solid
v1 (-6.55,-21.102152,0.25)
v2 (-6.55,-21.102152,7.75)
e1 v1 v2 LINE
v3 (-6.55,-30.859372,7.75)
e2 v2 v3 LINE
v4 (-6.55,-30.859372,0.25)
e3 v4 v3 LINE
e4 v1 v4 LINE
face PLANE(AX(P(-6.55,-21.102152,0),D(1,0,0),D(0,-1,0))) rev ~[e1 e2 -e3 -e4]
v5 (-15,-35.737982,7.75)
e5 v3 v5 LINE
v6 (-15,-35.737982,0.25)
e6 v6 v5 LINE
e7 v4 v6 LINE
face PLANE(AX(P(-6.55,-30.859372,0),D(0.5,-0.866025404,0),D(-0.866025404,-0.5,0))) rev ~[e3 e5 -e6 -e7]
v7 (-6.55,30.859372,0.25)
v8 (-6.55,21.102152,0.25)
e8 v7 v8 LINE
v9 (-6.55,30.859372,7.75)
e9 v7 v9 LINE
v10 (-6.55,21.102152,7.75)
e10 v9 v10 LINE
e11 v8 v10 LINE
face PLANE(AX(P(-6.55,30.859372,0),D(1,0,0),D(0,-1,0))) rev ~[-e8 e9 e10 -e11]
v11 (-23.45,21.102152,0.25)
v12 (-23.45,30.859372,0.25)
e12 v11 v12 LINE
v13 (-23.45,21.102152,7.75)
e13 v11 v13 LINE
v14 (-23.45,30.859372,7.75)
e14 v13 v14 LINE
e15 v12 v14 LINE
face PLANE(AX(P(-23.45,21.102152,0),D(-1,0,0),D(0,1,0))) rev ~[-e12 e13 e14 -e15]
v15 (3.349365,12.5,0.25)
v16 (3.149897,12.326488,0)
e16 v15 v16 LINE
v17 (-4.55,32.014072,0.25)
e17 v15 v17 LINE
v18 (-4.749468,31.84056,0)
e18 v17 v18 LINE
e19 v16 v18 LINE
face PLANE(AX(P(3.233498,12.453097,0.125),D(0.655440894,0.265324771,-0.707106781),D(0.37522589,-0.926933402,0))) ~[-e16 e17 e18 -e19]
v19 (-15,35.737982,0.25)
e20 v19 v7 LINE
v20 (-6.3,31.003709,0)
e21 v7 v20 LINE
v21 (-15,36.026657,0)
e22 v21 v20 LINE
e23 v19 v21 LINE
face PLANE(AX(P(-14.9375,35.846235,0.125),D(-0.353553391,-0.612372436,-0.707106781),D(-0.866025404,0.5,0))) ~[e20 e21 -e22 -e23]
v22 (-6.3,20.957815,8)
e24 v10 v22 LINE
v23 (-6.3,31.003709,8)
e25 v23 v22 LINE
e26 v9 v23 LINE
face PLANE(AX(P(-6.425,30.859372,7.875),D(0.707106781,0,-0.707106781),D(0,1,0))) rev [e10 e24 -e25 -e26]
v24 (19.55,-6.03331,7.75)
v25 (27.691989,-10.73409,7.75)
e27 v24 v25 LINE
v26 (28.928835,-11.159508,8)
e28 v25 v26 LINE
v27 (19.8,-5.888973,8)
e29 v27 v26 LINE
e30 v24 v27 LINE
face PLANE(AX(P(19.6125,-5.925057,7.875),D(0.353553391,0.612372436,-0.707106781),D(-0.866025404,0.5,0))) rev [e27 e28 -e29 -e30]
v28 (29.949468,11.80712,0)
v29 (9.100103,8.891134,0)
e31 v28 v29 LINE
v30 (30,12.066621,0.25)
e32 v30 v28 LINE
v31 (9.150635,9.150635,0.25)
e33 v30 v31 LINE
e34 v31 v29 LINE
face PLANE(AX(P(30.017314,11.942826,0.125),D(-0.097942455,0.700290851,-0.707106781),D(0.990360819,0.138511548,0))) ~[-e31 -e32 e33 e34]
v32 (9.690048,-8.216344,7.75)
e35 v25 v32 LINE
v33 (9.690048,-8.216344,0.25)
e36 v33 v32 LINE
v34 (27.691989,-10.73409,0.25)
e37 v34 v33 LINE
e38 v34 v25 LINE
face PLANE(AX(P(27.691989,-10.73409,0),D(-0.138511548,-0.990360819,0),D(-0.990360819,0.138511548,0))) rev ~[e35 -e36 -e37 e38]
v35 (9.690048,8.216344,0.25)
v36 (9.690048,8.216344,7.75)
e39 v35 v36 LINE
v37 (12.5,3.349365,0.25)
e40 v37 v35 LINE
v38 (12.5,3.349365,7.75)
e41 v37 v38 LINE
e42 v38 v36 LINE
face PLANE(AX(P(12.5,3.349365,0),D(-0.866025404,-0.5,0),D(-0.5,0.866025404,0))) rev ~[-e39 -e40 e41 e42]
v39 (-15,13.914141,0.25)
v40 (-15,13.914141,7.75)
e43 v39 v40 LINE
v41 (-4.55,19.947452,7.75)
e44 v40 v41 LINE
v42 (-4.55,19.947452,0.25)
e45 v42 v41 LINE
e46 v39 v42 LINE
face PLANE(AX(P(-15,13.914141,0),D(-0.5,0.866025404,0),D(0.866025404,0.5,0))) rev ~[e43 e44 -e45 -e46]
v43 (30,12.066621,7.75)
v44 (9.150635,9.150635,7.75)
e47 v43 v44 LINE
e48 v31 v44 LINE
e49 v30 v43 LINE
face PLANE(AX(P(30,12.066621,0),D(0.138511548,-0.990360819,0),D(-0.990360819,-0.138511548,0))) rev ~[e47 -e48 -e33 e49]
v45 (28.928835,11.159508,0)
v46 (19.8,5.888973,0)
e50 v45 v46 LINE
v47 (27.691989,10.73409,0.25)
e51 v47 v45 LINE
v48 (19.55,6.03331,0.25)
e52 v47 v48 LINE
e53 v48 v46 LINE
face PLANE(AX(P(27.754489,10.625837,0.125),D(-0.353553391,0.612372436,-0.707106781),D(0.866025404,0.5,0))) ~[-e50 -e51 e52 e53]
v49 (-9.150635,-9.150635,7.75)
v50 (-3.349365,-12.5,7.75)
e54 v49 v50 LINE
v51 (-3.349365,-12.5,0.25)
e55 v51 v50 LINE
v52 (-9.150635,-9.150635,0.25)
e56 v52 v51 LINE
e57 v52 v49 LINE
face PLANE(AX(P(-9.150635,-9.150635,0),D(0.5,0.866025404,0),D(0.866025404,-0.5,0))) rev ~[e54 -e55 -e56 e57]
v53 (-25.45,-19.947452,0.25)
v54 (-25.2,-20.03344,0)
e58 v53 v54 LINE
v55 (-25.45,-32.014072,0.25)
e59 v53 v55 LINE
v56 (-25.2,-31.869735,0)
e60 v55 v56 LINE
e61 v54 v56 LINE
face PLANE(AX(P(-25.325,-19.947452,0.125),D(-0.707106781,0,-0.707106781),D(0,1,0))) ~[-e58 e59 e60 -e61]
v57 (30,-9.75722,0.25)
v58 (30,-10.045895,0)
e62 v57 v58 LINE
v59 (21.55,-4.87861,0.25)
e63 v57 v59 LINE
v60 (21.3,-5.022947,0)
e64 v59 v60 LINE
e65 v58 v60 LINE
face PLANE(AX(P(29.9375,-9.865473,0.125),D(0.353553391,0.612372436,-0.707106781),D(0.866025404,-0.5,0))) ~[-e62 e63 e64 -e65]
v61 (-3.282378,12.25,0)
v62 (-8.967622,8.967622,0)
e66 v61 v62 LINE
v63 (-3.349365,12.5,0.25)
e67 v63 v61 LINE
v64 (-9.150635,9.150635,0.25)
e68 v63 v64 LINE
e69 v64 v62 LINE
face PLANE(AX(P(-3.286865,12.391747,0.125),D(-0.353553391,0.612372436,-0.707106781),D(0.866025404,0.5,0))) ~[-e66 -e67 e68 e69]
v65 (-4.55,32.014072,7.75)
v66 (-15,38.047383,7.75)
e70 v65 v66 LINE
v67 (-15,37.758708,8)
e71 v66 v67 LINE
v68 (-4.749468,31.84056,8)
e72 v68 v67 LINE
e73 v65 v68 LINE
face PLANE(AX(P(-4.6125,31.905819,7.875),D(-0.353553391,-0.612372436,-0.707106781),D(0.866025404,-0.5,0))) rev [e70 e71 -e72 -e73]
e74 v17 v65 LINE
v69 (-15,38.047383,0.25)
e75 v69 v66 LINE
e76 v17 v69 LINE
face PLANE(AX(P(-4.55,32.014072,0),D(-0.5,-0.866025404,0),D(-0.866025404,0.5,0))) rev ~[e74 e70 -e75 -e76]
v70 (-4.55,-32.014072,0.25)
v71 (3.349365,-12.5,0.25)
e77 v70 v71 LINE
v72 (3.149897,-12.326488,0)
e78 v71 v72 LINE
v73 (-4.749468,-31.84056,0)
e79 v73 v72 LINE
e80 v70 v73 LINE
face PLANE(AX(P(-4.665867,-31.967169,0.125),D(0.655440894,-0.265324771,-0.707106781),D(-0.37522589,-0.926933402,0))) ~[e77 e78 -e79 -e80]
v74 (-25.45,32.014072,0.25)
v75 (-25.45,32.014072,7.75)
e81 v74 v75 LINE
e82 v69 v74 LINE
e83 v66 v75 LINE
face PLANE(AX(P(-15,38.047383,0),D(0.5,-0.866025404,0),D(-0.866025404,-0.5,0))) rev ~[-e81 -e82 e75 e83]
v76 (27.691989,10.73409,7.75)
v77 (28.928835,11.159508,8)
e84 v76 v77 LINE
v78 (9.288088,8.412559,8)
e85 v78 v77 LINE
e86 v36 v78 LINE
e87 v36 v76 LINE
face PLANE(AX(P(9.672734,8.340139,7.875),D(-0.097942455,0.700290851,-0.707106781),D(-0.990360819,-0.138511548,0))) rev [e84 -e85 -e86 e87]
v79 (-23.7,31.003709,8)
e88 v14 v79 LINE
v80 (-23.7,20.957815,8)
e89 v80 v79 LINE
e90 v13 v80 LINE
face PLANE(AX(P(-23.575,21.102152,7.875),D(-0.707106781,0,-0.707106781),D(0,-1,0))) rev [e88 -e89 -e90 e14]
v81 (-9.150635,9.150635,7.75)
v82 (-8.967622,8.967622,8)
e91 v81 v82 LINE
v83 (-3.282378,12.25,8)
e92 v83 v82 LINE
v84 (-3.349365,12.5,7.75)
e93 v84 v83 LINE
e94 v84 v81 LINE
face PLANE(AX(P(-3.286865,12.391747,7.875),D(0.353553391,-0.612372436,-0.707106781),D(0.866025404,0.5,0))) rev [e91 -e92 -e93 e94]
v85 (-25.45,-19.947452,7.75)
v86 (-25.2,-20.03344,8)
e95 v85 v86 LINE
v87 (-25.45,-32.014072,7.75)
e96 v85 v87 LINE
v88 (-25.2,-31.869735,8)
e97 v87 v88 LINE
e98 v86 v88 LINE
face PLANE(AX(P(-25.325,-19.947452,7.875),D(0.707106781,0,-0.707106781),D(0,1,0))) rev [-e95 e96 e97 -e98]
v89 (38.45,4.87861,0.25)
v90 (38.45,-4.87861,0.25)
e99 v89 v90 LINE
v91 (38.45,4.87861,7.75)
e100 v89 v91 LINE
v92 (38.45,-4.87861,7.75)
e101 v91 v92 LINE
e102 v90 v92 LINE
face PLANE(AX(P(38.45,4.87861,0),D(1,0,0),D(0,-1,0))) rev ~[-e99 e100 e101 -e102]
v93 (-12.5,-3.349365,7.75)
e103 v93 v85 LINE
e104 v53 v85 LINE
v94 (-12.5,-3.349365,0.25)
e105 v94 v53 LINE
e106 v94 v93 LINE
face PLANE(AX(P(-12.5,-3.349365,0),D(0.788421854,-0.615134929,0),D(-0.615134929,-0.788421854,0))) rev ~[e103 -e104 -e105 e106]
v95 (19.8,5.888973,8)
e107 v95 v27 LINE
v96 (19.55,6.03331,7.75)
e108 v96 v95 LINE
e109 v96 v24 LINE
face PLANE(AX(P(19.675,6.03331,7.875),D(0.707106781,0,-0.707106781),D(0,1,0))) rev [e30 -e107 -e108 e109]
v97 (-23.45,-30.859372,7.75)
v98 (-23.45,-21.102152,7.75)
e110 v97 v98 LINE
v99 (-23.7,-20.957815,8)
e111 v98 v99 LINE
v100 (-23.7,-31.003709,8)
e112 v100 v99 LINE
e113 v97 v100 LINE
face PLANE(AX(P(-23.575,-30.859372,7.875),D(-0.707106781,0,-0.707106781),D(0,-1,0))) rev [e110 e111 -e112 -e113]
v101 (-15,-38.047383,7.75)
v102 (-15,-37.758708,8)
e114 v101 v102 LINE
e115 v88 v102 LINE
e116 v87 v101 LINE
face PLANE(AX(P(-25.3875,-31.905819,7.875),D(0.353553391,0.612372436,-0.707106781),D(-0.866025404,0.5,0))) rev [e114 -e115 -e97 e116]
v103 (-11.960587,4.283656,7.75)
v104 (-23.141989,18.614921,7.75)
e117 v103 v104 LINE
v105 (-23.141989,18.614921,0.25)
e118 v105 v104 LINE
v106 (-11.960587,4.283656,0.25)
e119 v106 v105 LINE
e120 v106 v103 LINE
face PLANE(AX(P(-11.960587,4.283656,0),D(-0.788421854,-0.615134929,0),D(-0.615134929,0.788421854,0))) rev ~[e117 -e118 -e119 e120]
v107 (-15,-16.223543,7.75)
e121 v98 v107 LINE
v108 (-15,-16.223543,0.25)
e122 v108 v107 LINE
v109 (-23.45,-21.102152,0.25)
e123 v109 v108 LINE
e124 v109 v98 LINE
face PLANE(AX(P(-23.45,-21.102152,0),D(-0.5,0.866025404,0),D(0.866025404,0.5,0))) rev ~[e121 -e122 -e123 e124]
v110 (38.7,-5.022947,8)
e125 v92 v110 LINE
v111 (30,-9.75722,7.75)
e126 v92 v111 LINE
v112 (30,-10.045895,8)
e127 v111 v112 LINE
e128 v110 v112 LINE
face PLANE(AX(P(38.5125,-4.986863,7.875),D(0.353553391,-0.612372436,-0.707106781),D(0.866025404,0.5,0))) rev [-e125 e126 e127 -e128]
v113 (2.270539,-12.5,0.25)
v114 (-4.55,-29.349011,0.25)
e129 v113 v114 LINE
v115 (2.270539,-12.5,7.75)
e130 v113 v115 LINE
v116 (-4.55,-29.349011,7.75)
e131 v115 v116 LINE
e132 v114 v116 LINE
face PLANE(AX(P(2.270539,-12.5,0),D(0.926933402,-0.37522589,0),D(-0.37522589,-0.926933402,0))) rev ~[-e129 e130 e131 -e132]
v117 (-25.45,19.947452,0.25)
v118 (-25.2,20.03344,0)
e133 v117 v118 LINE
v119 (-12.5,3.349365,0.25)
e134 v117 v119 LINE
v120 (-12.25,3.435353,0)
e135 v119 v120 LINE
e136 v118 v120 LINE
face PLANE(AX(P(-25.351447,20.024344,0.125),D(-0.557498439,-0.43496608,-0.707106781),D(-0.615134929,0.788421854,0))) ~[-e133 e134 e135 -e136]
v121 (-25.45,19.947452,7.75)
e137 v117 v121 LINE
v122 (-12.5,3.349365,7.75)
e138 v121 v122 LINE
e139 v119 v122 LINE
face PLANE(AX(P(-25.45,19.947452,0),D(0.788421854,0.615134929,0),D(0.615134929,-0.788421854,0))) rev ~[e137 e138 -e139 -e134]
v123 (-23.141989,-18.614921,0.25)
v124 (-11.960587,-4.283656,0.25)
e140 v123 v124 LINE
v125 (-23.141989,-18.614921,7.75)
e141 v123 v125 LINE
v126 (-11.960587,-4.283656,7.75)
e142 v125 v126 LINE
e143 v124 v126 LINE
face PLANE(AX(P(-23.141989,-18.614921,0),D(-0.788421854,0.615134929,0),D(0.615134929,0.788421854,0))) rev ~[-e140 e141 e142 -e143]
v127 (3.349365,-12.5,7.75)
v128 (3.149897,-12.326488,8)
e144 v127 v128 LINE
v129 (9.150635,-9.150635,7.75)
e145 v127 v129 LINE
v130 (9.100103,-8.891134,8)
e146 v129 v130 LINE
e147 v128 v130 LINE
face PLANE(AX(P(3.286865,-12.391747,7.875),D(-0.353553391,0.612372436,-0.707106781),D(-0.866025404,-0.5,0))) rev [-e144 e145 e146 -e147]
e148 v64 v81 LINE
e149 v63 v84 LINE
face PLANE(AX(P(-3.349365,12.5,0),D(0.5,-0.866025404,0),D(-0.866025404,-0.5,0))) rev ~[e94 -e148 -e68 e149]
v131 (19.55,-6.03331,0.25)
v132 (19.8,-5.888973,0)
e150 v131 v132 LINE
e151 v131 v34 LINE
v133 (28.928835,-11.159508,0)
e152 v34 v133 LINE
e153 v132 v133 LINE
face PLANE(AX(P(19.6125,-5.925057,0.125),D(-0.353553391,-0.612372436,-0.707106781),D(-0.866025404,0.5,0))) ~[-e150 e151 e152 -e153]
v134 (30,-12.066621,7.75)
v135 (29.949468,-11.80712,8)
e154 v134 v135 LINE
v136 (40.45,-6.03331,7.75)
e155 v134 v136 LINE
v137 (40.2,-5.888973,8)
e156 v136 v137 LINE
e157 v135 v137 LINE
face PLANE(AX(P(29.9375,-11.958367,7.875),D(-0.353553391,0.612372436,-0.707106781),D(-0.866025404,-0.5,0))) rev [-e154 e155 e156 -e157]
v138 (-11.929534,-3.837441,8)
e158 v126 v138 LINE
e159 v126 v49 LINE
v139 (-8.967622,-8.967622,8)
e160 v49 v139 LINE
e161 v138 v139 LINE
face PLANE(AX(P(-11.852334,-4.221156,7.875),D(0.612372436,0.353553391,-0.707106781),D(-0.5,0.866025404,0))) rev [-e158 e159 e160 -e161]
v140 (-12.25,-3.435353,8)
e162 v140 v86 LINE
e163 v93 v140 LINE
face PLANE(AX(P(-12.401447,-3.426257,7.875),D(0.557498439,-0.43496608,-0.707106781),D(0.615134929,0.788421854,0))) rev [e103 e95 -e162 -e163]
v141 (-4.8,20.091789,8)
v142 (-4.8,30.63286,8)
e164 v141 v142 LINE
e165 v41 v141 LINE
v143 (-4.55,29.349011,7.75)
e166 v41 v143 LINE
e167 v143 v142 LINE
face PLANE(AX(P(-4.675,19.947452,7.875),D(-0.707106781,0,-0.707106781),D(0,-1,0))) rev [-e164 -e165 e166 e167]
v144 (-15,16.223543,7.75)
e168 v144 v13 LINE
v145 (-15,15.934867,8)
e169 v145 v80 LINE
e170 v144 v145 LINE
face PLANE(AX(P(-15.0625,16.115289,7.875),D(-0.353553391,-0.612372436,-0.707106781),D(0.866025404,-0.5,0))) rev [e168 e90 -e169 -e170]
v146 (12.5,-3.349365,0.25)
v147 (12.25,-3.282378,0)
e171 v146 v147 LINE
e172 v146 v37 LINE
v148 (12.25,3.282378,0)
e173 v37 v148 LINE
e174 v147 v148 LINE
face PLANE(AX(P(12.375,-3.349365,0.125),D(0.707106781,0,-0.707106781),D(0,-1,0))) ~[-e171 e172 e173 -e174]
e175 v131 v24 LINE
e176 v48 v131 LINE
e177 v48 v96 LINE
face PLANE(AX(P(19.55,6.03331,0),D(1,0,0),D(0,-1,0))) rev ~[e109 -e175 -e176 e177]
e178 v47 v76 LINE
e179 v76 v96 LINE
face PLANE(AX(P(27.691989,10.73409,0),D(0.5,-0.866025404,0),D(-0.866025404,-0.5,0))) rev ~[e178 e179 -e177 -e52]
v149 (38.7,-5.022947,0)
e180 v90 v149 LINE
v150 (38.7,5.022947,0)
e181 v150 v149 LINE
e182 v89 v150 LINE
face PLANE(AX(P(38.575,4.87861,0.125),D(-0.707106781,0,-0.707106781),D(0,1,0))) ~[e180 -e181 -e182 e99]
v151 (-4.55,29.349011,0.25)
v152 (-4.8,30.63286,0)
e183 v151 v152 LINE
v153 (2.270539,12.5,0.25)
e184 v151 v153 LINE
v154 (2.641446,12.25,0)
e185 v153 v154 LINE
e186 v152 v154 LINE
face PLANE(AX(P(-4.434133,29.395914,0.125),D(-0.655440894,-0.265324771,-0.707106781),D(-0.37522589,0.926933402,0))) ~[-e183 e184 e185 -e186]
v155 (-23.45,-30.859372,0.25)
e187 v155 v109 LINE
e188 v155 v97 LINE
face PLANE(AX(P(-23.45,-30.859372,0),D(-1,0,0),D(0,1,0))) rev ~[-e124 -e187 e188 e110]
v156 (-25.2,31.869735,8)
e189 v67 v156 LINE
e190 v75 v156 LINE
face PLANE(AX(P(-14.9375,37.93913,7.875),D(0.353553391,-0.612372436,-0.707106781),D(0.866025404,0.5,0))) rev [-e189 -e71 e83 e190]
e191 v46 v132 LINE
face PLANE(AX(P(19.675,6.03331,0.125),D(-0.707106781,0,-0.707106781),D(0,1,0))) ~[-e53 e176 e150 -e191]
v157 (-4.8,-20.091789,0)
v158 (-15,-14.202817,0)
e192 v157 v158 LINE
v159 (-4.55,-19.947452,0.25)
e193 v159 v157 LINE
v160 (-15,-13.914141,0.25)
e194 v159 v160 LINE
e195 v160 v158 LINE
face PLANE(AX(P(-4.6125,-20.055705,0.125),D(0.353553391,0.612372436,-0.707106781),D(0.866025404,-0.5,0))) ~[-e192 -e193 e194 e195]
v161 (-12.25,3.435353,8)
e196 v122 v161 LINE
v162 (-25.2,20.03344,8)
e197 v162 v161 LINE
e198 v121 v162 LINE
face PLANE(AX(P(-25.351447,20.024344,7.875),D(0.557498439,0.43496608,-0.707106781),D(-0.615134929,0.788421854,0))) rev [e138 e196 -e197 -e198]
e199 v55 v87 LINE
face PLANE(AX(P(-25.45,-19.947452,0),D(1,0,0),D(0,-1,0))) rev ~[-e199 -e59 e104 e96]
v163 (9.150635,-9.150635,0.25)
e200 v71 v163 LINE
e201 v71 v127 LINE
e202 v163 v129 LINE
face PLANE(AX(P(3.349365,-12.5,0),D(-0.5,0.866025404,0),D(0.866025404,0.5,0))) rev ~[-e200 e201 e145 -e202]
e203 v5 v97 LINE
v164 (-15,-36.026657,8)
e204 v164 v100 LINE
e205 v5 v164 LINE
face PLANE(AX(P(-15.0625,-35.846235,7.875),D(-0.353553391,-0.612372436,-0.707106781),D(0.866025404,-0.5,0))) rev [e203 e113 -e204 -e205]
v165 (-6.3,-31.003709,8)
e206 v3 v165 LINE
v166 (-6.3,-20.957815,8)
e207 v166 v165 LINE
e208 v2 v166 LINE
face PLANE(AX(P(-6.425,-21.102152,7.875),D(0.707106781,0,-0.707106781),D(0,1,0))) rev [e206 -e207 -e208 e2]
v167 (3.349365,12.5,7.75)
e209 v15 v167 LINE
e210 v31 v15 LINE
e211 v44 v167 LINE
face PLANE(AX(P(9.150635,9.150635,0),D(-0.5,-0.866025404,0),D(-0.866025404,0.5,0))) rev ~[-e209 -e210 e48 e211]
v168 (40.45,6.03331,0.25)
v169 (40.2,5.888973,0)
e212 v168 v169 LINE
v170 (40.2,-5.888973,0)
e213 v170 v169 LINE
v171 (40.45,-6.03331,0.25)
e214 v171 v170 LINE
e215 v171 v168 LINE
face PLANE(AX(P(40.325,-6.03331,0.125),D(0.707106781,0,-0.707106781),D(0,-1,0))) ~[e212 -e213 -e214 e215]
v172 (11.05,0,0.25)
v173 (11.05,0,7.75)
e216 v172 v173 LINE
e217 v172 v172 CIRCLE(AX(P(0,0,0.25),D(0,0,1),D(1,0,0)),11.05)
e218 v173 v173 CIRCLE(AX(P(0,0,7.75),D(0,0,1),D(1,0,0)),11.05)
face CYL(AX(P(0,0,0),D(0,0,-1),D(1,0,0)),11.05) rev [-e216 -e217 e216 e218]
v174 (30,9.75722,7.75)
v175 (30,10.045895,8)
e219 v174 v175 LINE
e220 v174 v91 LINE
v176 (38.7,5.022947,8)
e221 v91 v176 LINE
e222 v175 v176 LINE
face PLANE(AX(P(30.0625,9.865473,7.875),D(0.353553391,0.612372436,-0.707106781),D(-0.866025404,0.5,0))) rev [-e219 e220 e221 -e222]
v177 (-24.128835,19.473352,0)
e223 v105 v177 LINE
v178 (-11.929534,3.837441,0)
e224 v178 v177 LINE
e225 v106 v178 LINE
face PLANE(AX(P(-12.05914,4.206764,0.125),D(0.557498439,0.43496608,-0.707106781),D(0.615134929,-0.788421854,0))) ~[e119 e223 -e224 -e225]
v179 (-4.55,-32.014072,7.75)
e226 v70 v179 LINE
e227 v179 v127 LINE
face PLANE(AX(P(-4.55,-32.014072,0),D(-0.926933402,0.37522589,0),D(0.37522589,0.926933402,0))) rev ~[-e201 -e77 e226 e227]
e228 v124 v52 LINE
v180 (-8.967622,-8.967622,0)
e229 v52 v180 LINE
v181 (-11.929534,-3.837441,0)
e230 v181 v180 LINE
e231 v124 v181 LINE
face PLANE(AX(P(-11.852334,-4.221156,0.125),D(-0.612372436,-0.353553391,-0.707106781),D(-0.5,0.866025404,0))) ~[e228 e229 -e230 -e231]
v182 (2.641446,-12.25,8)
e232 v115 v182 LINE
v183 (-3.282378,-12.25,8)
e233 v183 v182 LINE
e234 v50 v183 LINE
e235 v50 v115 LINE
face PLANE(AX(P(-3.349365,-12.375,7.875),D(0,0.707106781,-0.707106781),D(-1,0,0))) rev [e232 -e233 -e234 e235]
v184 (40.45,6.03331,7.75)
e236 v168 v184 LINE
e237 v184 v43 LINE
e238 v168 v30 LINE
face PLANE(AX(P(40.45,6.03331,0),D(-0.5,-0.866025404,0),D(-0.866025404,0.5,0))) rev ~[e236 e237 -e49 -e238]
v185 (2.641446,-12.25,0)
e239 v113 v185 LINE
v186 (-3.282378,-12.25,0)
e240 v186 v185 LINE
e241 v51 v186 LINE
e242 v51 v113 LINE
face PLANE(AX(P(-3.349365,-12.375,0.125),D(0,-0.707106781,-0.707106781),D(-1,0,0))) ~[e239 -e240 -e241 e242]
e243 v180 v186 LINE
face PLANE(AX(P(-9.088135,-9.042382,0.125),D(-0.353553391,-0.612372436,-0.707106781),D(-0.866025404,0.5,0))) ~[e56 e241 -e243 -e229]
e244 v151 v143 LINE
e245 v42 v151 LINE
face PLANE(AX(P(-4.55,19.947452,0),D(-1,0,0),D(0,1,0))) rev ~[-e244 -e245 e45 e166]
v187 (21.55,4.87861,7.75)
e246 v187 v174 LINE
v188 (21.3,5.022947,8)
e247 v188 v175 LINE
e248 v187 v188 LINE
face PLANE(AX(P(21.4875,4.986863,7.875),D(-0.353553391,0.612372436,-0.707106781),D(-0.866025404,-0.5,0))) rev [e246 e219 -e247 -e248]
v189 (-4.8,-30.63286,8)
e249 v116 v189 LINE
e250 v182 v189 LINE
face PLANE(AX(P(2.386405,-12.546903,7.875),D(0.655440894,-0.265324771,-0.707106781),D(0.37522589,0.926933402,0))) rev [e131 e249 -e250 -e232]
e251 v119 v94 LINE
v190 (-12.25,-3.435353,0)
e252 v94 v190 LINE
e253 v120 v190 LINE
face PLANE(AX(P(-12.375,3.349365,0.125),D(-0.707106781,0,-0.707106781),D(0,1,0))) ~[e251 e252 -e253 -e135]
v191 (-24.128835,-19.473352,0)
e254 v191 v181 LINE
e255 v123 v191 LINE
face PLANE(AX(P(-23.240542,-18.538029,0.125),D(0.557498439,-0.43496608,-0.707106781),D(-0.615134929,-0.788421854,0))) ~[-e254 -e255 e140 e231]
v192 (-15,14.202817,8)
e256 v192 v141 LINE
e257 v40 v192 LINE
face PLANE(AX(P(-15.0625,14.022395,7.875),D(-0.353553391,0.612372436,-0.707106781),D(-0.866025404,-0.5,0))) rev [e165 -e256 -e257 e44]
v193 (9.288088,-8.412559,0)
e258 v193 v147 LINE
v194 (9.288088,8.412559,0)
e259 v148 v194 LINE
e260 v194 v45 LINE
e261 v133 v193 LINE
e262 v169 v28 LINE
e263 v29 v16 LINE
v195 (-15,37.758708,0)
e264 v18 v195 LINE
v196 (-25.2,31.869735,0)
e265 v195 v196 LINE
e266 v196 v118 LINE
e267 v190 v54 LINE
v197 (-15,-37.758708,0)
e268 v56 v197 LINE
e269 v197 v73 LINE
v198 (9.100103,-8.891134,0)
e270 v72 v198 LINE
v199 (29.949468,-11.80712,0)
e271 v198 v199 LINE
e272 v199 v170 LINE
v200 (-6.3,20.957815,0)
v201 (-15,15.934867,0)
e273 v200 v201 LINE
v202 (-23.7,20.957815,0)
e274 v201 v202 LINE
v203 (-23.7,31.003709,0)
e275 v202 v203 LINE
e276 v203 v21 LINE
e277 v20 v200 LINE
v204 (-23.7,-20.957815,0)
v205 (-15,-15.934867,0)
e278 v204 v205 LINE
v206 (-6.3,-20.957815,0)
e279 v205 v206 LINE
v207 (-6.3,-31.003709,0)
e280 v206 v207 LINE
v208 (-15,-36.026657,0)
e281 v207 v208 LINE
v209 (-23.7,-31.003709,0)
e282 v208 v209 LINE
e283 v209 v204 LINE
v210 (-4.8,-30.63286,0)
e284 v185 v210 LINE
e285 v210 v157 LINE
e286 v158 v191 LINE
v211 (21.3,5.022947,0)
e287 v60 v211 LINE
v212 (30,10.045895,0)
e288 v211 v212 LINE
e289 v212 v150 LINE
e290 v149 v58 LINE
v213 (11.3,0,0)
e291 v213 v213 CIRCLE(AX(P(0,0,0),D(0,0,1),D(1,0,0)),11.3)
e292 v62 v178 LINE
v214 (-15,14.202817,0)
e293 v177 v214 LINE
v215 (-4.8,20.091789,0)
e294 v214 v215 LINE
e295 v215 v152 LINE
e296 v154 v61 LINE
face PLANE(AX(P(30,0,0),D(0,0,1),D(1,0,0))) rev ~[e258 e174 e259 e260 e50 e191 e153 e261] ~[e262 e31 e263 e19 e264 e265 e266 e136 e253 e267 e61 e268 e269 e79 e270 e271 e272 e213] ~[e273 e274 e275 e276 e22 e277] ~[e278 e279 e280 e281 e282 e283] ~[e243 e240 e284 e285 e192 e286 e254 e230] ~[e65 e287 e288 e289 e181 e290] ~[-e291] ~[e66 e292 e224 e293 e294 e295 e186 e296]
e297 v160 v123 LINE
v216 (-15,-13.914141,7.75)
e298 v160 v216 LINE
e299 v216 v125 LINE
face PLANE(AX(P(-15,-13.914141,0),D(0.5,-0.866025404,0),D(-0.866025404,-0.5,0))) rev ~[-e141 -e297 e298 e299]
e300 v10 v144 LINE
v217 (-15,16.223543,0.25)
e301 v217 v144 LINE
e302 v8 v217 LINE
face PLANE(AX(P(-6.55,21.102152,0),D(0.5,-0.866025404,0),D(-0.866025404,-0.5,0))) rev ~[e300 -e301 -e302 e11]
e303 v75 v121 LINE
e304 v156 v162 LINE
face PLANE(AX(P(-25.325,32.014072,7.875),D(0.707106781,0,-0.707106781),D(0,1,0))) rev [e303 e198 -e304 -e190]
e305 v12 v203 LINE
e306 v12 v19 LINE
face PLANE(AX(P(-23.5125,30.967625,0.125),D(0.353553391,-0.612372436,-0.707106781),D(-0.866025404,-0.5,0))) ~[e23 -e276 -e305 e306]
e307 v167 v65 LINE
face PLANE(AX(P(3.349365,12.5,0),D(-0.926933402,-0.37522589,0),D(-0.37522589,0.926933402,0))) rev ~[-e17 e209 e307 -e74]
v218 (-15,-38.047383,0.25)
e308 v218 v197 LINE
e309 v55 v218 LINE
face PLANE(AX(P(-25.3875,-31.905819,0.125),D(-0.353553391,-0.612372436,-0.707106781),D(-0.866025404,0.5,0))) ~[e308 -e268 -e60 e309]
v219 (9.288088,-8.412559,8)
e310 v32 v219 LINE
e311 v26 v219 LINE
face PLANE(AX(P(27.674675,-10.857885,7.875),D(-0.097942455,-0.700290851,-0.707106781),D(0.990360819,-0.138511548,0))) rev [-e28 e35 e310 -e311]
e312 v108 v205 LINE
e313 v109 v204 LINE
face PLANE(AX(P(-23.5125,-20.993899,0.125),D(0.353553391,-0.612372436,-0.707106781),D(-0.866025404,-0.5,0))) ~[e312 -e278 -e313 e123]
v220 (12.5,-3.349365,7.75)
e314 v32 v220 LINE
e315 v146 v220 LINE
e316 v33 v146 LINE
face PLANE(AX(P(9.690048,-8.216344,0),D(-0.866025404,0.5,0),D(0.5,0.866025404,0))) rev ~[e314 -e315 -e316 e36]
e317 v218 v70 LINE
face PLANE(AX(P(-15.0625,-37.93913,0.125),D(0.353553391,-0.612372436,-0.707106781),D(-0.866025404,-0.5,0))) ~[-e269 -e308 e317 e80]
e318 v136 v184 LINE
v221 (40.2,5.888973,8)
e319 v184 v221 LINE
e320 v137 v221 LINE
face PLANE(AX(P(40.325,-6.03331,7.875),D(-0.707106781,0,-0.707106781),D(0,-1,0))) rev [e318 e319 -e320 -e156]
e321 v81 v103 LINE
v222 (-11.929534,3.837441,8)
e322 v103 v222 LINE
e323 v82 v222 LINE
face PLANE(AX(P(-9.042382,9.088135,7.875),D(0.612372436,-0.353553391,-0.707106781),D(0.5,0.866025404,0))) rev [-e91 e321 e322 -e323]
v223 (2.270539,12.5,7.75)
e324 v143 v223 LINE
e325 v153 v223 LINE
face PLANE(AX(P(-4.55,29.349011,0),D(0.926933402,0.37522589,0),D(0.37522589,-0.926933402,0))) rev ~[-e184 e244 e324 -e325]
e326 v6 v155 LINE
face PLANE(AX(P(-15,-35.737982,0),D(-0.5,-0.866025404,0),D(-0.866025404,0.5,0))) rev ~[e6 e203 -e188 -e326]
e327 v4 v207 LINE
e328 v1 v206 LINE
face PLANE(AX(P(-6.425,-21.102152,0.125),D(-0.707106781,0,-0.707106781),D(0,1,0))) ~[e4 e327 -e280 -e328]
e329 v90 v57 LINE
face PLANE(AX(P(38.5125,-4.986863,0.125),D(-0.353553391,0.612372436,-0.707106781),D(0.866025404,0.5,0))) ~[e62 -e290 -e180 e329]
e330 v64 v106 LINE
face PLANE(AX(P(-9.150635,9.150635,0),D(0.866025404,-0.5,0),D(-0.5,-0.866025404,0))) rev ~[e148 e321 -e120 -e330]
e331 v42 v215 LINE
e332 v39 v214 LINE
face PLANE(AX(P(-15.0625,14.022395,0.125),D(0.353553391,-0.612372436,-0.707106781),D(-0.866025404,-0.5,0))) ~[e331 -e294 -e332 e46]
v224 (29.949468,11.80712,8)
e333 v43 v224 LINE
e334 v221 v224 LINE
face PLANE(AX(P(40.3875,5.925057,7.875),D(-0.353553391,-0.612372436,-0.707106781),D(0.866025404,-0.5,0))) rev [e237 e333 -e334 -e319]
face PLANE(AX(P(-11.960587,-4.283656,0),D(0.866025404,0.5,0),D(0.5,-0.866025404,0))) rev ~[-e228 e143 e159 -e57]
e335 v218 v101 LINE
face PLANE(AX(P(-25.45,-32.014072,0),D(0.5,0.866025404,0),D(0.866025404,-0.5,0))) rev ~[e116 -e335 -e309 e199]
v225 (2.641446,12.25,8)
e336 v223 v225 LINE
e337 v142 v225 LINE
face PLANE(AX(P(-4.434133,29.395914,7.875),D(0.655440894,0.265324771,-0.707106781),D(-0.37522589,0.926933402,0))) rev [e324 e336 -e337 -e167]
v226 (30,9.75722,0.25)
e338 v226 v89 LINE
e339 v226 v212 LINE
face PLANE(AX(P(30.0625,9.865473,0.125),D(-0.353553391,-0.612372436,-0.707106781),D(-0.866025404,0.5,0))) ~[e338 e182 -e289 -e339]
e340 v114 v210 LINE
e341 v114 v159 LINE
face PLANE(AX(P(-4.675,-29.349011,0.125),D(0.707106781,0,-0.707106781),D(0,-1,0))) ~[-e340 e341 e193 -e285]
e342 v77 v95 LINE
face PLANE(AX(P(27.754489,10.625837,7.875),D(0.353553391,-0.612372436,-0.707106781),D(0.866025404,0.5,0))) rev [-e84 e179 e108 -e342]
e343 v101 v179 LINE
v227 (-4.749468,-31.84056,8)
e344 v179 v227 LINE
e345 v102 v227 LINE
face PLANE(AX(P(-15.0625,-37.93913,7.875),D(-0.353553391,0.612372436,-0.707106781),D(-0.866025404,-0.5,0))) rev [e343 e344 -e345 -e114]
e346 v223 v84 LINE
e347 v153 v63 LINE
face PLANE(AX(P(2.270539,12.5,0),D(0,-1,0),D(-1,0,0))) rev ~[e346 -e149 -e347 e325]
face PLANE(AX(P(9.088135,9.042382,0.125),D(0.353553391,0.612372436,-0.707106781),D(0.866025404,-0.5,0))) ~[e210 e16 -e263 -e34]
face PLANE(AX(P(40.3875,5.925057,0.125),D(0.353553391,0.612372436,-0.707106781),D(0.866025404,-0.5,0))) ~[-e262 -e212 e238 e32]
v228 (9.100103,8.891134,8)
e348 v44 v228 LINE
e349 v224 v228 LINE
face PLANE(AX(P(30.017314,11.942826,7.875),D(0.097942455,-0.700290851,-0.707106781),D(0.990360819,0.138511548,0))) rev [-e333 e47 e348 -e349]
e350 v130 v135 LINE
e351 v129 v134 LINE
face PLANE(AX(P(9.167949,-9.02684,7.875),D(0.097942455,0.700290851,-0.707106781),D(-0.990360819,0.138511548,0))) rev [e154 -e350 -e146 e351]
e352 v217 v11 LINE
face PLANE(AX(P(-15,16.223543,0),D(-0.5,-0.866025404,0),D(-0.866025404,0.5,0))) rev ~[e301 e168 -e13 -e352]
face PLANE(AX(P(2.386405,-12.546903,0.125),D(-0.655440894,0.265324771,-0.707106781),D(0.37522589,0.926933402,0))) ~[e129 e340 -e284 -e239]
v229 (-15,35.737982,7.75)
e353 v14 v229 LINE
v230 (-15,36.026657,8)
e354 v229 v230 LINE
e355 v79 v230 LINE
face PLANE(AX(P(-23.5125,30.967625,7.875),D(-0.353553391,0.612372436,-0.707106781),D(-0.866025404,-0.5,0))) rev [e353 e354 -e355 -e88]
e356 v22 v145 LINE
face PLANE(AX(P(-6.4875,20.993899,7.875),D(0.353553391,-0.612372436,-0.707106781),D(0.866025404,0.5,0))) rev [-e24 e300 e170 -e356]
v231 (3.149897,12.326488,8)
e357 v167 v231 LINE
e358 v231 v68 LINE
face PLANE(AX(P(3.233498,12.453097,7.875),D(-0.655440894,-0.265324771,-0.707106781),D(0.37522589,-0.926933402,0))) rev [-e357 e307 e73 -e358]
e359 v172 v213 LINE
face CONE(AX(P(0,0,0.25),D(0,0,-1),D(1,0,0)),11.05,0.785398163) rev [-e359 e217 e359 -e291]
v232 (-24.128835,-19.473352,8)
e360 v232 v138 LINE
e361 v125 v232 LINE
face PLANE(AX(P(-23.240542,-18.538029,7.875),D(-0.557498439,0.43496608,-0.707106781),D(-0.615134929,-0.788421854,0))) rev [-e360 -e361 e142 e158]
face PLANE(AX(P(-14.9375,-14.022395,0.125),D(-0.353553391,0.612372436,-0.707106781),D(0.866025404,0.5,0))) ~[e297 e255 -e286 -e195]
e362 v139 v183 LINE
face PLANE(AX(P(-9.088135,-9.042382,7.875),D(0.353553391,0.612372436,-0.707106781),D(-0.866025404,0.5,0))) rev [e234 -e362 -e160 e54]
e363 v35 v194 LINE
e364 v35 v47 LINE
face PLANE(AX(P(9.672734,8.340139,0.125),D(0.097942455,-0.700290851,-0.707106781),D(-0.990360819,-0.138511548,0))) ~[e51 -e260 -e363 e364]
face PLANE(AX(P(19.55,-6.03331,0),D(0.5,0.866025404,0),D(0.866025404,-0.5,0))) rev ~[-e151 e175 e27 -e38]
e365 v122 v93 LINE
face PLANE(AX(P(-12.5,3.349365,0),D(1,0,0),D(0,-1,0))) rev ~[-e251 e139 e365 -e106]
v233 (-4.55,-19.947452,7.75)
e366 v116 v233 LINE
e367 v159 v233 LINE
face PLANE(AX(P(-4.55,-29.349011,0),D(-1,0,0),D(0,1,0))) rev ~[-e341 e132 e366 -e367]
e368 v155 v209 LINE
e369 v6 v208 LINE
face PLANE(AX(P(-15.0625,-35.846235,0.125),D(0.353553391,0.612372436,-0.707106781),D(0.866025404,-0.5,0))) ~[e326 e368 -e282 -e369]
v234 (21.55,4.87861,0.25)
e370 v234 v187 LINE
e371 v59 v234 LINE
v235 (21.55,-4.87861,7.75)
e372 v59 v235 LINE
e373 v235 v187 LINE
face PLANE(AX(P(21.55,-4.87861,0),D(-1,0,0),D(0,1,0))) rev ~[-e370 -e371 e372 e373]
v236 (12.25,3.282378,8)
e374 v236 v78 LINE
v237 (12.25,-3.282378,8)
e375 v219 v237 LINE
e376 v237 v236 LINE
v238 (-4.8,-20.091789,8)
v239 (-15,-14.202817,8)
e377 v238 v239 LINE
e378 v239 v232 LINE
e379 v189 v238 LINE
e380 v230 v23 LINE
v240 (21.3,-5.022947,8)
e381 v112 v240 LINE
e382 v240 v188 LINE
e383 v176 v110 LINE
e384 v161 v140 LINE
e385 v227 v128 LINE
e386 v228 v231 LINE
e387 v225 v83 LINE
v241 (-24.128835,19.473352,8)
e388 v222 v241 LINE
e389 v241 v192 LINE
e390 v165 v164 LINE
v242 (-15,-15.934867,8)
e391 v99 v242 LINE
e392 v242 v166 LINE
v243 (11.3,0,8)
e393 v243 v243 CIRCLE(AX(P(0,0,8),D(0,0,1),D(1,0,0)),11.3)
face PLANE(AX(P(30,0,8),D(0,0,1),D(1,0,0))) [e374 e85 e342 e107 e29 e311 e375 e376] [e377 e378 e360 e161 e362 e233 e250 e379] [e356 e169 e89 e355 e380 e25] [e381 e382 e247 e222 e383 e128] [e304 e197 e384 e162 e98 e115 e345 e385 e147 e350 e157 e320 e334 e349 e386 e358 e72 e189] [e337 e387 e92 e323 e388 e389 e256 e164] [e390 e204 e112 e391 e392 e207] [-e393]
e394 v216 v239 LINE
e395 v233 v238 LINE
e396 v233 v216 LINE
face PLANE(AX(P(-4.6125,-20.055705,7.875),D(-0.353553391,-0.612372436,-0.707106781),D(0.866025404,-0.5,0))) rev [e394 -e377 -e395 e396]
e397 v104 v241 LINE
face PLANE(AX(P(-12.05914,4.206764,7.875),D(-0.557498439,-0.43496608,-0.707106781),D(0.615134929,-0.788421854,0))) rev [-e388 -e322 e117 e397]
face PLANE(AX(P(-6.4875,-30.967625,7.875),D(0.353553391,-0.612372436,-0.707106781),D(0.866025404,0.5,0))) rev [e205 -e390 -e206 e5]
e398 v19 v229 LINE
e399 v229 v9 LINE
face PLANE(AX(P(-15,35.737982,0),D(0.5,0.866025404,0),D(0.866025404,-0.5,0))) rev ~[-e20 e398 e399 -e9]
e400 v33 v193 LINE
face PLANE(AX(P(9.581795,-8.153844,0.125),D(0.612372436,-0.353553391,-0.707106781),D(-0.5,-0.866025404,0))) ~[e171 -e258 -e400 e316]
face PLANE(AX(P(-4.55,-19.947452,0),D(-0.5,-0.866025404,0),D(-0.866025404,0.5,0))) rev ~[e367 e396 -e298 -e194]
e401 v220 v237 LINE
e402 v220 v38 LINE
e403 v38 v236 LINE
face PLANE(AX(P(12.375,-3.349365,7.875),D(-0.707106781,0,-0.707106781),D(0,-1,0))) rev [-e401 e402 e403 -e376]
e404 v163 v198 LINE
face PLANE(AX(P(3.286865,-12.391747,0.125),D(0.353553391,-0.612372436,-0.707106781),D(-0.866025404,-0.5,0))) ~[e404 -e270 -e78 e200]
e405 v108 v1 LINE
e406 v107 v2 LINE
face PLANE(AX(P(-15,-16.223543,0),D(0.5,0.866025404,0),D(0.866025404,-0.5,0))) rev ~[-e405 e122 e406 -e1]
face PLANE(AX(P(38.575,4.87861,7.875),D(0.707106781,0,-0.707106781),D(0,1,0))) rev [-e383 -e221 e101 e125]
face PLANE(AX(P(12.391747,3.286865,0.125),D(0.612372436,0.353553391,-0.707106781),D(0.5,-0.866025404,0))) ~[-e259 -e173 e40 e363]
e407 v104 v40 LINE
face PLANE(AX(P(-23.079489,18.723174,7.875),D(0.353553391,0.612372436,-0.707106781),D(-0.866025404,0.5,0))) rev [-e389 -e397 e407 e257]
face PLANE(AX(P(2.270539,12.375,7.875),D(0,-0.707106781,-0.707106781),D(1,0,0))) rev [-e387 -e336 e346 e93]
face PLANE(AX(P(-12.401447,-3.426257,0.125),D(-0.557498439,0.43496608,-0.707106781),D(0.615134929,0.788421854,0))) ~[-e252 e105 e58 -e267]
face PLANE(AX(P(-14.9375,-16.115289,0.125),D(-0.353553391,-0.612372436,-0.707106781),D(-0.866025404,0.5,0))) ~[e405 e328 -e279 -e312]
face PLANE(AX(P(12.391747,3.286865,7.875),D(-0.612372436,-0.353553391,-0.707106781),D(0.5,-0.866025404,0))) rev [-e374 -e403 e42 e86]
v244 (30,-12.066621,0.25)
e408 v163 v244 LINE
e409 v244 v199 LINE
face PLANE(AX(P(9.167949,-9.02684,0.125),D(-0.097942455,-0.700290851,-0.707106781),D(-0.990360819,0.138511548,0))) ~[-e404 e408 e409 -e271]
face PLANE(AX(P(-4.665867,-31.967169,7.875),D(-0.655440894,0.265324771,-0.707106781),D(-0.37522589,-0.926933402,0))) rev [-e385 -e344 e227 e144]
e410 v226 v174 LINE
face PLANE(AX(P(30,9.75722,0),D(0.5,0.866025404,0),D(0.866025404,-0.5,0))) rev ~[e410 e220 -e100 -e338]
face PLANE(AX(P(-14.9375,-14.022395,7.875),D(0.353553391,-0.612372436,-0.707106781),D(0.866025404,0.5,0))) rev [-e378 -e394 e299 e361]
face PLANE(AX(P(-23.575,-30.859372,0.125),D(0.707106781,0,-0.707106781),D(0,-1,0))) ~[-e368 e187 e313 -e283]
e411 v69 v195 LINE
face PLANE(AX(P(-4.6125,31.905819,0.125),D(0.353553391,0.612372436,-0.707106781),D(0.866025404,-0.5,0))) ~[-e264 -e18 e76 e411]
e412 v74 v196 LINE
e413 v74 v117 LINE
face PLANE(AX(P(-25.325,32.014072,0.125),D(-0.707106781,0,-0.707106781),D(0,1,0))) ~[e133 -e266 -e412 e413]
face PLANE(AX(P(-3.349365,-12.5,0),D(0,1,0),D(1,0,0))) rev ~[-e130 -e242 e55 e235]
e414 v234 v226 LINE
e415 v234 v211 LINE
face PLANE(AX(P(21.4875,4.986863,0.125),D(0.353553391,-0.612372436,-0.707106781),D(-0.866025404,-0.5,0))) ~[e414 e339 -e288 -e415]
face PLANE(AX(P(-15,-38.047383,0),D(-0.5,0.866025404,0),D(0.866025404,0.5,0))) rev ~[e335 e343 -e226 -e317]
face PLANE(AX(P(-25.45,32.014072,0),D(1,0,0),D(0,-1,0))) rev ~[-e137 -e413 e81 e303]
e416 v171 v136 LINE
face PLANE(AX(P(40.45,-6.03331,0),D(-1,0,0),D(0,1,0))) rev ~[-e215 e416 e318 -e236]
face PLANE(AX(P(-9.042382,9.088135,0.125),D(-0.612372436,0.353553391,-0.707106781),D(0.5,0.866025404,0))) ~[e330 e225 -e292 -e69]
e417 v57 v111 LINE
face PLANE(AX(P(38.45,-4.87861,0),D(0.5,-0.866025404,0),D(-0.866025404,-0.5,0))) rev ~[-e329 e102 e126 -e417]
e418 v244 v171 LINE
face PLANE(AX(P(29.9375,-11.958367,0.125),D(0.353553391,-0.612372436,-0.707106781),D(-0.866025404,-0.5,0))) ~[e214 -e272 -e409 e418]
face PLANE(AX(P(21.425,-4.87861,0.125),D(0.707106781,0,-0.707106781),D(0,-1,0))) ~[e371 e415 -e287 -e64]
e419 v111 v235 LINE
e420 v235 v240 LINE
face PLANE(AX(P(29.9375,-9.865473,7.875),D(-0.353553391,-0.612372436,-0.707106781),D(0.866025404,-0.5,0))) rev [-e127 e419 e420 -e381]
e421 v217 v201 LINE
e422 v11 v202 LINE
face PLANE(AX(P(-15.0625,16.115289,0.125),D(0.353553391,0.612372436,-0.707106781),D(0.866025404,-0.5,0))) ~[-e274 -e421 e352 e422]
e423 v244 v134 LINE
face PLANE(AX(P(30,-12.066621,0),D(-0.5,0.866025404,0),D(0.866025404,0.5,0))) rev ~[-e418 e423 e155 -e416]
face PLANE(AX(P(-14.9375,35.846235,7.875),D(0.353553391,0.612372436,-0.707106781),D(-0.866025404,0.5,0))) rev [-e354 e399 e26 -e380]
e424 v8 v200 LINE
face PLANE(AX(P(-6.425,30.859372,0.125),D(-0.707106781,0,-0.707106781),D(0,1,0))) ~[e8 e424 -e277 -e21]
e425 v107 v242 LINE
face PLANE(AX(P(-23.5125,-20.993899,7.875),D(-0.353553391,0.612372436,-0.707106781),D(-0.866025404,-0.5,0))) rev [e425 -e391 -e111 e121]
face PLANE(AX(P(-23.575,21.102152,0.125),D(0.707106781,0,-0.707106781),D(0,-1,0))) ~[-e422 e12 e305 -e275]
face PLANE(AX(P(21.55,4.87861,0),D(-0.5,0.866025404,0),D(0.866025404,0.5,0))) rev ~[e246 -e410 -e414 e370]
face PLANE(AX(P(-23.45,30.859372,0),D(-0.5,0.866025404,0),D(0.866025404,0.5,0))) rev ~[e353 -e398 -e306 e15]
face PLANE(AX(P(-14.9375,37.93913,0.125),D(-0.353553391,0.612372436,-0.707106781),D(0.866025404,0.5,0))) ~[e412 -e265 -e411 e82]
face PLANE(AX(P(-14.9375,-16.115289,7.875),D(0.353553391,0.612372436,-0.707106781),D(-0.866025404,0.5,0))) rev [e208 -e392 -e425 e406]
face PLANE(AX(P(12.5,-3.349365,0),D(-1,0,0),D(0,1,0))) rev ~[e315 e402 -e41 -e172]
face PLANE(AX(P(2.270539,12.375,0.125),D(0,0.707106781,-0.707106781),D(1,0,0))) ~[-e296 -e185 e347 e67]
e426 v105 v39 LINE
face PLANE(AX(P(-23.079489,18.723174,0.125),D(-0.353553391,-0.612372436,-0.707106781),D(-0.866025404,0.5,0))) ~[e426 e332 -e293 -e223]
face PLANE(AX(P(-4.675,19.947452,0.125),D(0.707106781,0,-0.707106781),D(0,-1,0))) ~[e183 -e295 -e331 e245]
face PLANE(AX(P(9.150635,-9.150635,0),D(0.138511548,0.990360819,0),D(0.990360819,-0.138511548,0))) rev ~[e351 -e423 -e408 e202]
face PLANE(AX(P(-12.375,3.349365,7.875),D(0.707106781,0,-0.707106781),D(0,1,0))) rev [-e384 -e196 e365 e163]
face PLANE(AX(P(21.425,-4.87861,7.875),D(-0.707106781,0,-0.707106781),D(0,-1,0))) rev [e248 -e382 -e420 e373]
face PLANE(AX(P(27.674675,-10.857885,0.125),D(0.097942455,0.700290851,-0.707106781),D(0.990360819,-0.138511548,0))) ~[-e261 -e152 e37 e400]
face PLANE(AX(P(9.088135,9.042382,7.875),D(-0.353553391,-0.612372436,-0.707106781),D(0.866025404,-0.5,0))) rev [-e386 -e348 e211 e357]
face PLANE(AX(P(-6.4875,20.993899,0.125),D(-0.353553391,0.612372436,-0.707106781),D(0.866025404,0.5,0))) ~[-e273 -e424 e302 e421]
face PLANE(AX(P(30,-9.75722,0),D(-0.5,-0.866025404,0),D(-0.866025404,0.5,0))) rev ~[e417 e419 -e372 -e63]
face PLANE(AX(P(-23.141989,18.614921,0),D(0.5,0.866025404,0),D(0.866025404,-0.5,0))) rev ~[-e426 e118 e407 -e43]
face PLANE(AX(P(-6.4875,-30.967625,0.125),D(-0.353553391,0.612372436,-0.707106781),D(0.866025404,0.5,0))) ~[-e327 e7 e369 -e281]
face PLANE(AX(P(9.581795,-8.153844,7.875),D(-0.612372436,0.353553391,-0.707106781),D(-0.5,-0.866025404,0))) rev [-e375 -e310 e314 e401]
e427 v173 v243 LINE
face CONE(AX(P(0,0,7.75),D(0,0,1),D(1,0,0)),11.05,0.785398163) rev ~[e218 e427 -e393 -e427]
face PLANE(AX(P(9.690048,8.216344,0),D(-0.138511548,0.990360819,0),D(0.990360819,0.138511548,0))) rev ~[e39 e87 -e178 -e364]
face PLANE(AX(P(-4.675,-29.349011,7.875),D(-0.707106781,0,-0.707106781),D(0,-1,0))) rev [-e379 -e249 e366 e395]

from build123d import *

# Parameters (mm, degrees)
F1_R     = 11.05
F2_DEPTH = 8
F3_SIZE  = 0.25


with BuildPart() as f2:
    # F1 (on Top) → F2 (new body)
    with BuildSketch(Plane.XY):
        Polygon((30, -12.0666206261), (40.45, -6.033310313), (40.45, 6.033310313), (30, 12.0666206261), (27.6919892048, 10.7340899722), (19.55, 6.033310313), (19.55, -6.033310313), (27.6919892048, -10.7340899722), align=None)
        Polygon((21.55, 4.8786097747), (30, 9.7572195493), (38.45, 4.8786097747), (38.45, -4.8786097747), (30, -9.7572195493), (21.55, -4.8786097747), align=None, mode=Mode.SUBTRACT)
        Polygon((9.1506350946, -9.1506350946), (30, -12.0666206261), (27.6919892048, -10.7340899722), (9.6900481732, -8.2163442363), align=None)
        Polygon((27.6919892048, 10.7340899722), (30, 12.0666206261), (9.1506350946, 9.1506350946), (9.6900481732, 8.2163442363), align=None)
        Polygon((3.3493649054, -12.5), (9.1506350946, -9.1506350946), (9.6900481732, -8.2163442363), (12.5, -3.3493649054), (12.5, 3.3493649054), (9.6900481732, 8.2163442363), (9.1506350946, 9.1506350946), (3.3493649054, 12.5), (2.2705387483, 12.5), (-3.3493649054, 12.5), (-9.1506350946, 9.1506350946), (-11.9605869214, 4.2836557637), (-12.5, 3.3493649054), (-12.5, -3.3493649054), (-11.9605869214, -4.2836557637), (-9.1506350946, -9.1506350946), (-3.3493649054, -12.5), (2.2705387483, -12.5), align=None)
        Circle(F1_R, mode=Mode.SUBTRACT)
        Polygon((-4.55, -32.0140724266), (3.3493649054, -12.5), (2.2705387483, -12.5), (-4.55, -29.3490111188), align=None)
        Polygon((2.2705387483, 12.5), (3.3493649054, 12.5), (-4.55, 32.0140724266), (-4.55, 29.3490111188), align=None)
        Polygon((-15, -38.0473827396), (-4.55, -32.0140724266), (-4.55, -29.3490111188), (-4.55, -19.9474518005), (-15, -13.9141414875), (-23.1419892048, -18.6149211466), (-25.45, -19.9474518005), (-25.45, -32.0140724266), align=None)
        Polygon((-23.45, -21.1021523389), (-15, -16.2235425642), (-6.55, -21.1021523389), (-6.55, -30.8593718882), (-15, -35.7379816628), (-23.45, -30.8593718882), align=None, mode=Mode.SUBTRACT)
        Polygon((-4.55, 29.3490111188), (-4.55, 32.0140724266), (-15, 38.0473827396), (-25.45, 32.0140724266), (-25.45, 19.9474518005), (-23.1419892048, 18.6149211466), (-15, 13.9141414875), (-4.55, 19.9474518005), align=None)
        Polygon((-6.55, 30.8593718882), (-6.55, 21.1021523389), (-15, 16.2235425642), (-23.45, 21.1021523389), (-23.45, 30.8593718882), (-15, 35.7379816628), align=None, mode=Mode.SUBTRACT)
        Polygon((-23.1419892048, -18.6149211466), (-11.9605869214, -4.2836557637), (-12.5, -3.3493649054), (-25.45, -19.9474518005), align=None)
        Polygon((-12.5, 3.3493649054), (-11.9605869214, 4.2836557637), (-23.1419892048, 18.6149211466), (-25.45, 19.9474518005), align=None)
    extrude(amount=F2_DEPTH)

    # F3
    f3_edges = [f2.edges().sort_by_distance(p)[0] for p in [
        (35.225, -9.049965, 0),
        (40.45, 0, 0),
        (35.225, 9.049965, 0),
        (19.575318, 10.608628, 0),
        (6.25, 10.825318, 0),
        (-0.600318, 22.257036, 0),
        (-9.775, 35.030728, 0),
        (-20.225, 35.030728, 0),
        (-25.45, 25.980762, 0),
        (-18.975, 11.648408, 0),
        (-12.5, 0, 0),
        (-18.975, -11.648408, 0),
        (-25.45, -25.980762, 0),
        (-20.225, -35.030728, 0),
        (-9.775, -35.030728, 0),
        (-0.600318, -22.257036, 0),
        (6.25, -10.825318, 0),
        (19.575318, -10.608628, 0),
        (-19.070995, 16.264531, 0),
        (-9.775, 16.930797, 0),
        (-4.55, 24.648231, 0),
        (-1.139731, 20.924506, 0),
        (-0.539413, 12.5, 0),
        (-6.25, 10.825318, 0),
        (-10.555611, 6.717145, 0),
        (-17.551288, 11.449288, 0),
        (-10.555611, -6.717145, 0),
        (-6.25, -10.825318, 0),
        (-0.539413, -12.5, 0),
        (-1.139731, -20.924506, 0),
        (-4.55, -24.648231, 0),
        (-9.775, -16.930797, 0),
        (-19.070995, -16.264531, 0),
        (-17.551288, -11.449288, 0),
        (18.691019, 9.475217, 0),
        (23.620995, 8.3837, 0),
        (19.55, 0, 0),
        (23.620995, -8.3837, 0),
        (18.691019, -9.475217, 0),
        (11.095024, -5.782855, 0),
        (12.5, 0, 0),
        (11.095024, 5.782855, 0),
        (25.775, -7.317915, 0),
        (21.55, 0, 0),
        (25.775, 7.317915, 0),
        (34.225, 7.317915, 0),
        (38.45, 0, 0),
        (34.225, -7.317915, 0),
        (-11.05, 0, 0),
        (-23.45, -25.980762, 0),
        (-19.225, -18.662847, 0),
        (-10.775, -18.662847, 0),
        (-6.55, -25.980762, 0),
        (-10.775, -33.298677, 0),
        (-19.225, -33.298677, 0),
        (-19.225, 33.298677, 0),
        (-10.775, 33.298677, 0),
        (-6.55, 25.980762, 0),
        (-10.775, 18.662847, 0),
        (-19.225, 18.662847, 0),
        (-23.45, 25.980762, 0),
        (35.225, -9.049965, 8),
        (40.45, 0, 8),
        (35.225, 9.049965, 8),
        (19.575318, 10.608628, 8),
        (6.25, 10.825318, 8),
        (-0.600318, 22.257036, 8),
        (-9.775, 35.030728, 8),
        (-20.225, 35.030728, 8),
        (-25.45, 25.980762, 8),
        (-18.975, 11.648408, 8),
        (-12.5, 0, 8),
        (-18.975, -11.648408, 8),
        (-25.45, -25.980762, 8),
        (-20.225, -35.030728, 8),
        (-9.775, -35.030728, 8),
        (-0.600318, -22.257036, 8),
        (6.25, -10.825318, 8),
        (19.575318, -10.608628, 8),
        (-19.070995, 16.264531, 8),
        (-9.775, 16.930797, 8),
        (-4.55, 24.648231, 8),
        (-1.139731, 20.924506, 8),
        (-0.539413, 12.5, 8),
        (-6.25, 10.825318, 8),
        (-10.555611, 6.717145, 8),
        (-17.551288, 11.449288, 8),
        (-10.555611, -6.717145, 8),
        (-6.25, -10.825318, 8),
        (-0.539413, -12.5, 8),
        (-1.139731, -20.924506, 8),
        (-4.55, -24.648231, 8),
        (-9.775, -16.930797, 8),
        (-19.070995, -16.264531, 8),
        (-17.551288, -11.449288, 8),
        (18.691019, 9.475217, 8),
        (23.620995, 8.3837, 8),
        (19.55, 0, 8),
        (23.620995, -8.3837, 8),
        (18.691019, -9.475217, 8),
        (11.095024, -5.782855, 8),
        (12.5, 0, 8),
        (11.095024, 5.782855, 8),
        (25.775, -7.317915, 8),
        (21.55, 0, 8),
        (25.775, 7.317915, 8),
        (34.225, 7.317915, 8),
        (38.45, 0, 8),
        (34.225, -7.317915, 8),
        (-11.05, 0, 8),
        (-23.45, -25.980762, 8),
        (-19.225, -18.662847, 8),
        (-10.775, -18.662847, 8),
        (-6.55, -25.980762, 8),
        (-10.775, -33.298677, 8),
        (-19.225, -33.298677, 8),
        (-19.225, 33.298677, 8),
        (-10.775, 33.298677, 8),
        (-6.55, 25.980762, 8),
        (-10.775, 18.662847, 8),
        (-19.225, 18.662847, 8),
        (-23.45, 25.980762, 8),
    ]]
    chamfer(f3_edges, length=F3_SIZE)


solid = f2.part
